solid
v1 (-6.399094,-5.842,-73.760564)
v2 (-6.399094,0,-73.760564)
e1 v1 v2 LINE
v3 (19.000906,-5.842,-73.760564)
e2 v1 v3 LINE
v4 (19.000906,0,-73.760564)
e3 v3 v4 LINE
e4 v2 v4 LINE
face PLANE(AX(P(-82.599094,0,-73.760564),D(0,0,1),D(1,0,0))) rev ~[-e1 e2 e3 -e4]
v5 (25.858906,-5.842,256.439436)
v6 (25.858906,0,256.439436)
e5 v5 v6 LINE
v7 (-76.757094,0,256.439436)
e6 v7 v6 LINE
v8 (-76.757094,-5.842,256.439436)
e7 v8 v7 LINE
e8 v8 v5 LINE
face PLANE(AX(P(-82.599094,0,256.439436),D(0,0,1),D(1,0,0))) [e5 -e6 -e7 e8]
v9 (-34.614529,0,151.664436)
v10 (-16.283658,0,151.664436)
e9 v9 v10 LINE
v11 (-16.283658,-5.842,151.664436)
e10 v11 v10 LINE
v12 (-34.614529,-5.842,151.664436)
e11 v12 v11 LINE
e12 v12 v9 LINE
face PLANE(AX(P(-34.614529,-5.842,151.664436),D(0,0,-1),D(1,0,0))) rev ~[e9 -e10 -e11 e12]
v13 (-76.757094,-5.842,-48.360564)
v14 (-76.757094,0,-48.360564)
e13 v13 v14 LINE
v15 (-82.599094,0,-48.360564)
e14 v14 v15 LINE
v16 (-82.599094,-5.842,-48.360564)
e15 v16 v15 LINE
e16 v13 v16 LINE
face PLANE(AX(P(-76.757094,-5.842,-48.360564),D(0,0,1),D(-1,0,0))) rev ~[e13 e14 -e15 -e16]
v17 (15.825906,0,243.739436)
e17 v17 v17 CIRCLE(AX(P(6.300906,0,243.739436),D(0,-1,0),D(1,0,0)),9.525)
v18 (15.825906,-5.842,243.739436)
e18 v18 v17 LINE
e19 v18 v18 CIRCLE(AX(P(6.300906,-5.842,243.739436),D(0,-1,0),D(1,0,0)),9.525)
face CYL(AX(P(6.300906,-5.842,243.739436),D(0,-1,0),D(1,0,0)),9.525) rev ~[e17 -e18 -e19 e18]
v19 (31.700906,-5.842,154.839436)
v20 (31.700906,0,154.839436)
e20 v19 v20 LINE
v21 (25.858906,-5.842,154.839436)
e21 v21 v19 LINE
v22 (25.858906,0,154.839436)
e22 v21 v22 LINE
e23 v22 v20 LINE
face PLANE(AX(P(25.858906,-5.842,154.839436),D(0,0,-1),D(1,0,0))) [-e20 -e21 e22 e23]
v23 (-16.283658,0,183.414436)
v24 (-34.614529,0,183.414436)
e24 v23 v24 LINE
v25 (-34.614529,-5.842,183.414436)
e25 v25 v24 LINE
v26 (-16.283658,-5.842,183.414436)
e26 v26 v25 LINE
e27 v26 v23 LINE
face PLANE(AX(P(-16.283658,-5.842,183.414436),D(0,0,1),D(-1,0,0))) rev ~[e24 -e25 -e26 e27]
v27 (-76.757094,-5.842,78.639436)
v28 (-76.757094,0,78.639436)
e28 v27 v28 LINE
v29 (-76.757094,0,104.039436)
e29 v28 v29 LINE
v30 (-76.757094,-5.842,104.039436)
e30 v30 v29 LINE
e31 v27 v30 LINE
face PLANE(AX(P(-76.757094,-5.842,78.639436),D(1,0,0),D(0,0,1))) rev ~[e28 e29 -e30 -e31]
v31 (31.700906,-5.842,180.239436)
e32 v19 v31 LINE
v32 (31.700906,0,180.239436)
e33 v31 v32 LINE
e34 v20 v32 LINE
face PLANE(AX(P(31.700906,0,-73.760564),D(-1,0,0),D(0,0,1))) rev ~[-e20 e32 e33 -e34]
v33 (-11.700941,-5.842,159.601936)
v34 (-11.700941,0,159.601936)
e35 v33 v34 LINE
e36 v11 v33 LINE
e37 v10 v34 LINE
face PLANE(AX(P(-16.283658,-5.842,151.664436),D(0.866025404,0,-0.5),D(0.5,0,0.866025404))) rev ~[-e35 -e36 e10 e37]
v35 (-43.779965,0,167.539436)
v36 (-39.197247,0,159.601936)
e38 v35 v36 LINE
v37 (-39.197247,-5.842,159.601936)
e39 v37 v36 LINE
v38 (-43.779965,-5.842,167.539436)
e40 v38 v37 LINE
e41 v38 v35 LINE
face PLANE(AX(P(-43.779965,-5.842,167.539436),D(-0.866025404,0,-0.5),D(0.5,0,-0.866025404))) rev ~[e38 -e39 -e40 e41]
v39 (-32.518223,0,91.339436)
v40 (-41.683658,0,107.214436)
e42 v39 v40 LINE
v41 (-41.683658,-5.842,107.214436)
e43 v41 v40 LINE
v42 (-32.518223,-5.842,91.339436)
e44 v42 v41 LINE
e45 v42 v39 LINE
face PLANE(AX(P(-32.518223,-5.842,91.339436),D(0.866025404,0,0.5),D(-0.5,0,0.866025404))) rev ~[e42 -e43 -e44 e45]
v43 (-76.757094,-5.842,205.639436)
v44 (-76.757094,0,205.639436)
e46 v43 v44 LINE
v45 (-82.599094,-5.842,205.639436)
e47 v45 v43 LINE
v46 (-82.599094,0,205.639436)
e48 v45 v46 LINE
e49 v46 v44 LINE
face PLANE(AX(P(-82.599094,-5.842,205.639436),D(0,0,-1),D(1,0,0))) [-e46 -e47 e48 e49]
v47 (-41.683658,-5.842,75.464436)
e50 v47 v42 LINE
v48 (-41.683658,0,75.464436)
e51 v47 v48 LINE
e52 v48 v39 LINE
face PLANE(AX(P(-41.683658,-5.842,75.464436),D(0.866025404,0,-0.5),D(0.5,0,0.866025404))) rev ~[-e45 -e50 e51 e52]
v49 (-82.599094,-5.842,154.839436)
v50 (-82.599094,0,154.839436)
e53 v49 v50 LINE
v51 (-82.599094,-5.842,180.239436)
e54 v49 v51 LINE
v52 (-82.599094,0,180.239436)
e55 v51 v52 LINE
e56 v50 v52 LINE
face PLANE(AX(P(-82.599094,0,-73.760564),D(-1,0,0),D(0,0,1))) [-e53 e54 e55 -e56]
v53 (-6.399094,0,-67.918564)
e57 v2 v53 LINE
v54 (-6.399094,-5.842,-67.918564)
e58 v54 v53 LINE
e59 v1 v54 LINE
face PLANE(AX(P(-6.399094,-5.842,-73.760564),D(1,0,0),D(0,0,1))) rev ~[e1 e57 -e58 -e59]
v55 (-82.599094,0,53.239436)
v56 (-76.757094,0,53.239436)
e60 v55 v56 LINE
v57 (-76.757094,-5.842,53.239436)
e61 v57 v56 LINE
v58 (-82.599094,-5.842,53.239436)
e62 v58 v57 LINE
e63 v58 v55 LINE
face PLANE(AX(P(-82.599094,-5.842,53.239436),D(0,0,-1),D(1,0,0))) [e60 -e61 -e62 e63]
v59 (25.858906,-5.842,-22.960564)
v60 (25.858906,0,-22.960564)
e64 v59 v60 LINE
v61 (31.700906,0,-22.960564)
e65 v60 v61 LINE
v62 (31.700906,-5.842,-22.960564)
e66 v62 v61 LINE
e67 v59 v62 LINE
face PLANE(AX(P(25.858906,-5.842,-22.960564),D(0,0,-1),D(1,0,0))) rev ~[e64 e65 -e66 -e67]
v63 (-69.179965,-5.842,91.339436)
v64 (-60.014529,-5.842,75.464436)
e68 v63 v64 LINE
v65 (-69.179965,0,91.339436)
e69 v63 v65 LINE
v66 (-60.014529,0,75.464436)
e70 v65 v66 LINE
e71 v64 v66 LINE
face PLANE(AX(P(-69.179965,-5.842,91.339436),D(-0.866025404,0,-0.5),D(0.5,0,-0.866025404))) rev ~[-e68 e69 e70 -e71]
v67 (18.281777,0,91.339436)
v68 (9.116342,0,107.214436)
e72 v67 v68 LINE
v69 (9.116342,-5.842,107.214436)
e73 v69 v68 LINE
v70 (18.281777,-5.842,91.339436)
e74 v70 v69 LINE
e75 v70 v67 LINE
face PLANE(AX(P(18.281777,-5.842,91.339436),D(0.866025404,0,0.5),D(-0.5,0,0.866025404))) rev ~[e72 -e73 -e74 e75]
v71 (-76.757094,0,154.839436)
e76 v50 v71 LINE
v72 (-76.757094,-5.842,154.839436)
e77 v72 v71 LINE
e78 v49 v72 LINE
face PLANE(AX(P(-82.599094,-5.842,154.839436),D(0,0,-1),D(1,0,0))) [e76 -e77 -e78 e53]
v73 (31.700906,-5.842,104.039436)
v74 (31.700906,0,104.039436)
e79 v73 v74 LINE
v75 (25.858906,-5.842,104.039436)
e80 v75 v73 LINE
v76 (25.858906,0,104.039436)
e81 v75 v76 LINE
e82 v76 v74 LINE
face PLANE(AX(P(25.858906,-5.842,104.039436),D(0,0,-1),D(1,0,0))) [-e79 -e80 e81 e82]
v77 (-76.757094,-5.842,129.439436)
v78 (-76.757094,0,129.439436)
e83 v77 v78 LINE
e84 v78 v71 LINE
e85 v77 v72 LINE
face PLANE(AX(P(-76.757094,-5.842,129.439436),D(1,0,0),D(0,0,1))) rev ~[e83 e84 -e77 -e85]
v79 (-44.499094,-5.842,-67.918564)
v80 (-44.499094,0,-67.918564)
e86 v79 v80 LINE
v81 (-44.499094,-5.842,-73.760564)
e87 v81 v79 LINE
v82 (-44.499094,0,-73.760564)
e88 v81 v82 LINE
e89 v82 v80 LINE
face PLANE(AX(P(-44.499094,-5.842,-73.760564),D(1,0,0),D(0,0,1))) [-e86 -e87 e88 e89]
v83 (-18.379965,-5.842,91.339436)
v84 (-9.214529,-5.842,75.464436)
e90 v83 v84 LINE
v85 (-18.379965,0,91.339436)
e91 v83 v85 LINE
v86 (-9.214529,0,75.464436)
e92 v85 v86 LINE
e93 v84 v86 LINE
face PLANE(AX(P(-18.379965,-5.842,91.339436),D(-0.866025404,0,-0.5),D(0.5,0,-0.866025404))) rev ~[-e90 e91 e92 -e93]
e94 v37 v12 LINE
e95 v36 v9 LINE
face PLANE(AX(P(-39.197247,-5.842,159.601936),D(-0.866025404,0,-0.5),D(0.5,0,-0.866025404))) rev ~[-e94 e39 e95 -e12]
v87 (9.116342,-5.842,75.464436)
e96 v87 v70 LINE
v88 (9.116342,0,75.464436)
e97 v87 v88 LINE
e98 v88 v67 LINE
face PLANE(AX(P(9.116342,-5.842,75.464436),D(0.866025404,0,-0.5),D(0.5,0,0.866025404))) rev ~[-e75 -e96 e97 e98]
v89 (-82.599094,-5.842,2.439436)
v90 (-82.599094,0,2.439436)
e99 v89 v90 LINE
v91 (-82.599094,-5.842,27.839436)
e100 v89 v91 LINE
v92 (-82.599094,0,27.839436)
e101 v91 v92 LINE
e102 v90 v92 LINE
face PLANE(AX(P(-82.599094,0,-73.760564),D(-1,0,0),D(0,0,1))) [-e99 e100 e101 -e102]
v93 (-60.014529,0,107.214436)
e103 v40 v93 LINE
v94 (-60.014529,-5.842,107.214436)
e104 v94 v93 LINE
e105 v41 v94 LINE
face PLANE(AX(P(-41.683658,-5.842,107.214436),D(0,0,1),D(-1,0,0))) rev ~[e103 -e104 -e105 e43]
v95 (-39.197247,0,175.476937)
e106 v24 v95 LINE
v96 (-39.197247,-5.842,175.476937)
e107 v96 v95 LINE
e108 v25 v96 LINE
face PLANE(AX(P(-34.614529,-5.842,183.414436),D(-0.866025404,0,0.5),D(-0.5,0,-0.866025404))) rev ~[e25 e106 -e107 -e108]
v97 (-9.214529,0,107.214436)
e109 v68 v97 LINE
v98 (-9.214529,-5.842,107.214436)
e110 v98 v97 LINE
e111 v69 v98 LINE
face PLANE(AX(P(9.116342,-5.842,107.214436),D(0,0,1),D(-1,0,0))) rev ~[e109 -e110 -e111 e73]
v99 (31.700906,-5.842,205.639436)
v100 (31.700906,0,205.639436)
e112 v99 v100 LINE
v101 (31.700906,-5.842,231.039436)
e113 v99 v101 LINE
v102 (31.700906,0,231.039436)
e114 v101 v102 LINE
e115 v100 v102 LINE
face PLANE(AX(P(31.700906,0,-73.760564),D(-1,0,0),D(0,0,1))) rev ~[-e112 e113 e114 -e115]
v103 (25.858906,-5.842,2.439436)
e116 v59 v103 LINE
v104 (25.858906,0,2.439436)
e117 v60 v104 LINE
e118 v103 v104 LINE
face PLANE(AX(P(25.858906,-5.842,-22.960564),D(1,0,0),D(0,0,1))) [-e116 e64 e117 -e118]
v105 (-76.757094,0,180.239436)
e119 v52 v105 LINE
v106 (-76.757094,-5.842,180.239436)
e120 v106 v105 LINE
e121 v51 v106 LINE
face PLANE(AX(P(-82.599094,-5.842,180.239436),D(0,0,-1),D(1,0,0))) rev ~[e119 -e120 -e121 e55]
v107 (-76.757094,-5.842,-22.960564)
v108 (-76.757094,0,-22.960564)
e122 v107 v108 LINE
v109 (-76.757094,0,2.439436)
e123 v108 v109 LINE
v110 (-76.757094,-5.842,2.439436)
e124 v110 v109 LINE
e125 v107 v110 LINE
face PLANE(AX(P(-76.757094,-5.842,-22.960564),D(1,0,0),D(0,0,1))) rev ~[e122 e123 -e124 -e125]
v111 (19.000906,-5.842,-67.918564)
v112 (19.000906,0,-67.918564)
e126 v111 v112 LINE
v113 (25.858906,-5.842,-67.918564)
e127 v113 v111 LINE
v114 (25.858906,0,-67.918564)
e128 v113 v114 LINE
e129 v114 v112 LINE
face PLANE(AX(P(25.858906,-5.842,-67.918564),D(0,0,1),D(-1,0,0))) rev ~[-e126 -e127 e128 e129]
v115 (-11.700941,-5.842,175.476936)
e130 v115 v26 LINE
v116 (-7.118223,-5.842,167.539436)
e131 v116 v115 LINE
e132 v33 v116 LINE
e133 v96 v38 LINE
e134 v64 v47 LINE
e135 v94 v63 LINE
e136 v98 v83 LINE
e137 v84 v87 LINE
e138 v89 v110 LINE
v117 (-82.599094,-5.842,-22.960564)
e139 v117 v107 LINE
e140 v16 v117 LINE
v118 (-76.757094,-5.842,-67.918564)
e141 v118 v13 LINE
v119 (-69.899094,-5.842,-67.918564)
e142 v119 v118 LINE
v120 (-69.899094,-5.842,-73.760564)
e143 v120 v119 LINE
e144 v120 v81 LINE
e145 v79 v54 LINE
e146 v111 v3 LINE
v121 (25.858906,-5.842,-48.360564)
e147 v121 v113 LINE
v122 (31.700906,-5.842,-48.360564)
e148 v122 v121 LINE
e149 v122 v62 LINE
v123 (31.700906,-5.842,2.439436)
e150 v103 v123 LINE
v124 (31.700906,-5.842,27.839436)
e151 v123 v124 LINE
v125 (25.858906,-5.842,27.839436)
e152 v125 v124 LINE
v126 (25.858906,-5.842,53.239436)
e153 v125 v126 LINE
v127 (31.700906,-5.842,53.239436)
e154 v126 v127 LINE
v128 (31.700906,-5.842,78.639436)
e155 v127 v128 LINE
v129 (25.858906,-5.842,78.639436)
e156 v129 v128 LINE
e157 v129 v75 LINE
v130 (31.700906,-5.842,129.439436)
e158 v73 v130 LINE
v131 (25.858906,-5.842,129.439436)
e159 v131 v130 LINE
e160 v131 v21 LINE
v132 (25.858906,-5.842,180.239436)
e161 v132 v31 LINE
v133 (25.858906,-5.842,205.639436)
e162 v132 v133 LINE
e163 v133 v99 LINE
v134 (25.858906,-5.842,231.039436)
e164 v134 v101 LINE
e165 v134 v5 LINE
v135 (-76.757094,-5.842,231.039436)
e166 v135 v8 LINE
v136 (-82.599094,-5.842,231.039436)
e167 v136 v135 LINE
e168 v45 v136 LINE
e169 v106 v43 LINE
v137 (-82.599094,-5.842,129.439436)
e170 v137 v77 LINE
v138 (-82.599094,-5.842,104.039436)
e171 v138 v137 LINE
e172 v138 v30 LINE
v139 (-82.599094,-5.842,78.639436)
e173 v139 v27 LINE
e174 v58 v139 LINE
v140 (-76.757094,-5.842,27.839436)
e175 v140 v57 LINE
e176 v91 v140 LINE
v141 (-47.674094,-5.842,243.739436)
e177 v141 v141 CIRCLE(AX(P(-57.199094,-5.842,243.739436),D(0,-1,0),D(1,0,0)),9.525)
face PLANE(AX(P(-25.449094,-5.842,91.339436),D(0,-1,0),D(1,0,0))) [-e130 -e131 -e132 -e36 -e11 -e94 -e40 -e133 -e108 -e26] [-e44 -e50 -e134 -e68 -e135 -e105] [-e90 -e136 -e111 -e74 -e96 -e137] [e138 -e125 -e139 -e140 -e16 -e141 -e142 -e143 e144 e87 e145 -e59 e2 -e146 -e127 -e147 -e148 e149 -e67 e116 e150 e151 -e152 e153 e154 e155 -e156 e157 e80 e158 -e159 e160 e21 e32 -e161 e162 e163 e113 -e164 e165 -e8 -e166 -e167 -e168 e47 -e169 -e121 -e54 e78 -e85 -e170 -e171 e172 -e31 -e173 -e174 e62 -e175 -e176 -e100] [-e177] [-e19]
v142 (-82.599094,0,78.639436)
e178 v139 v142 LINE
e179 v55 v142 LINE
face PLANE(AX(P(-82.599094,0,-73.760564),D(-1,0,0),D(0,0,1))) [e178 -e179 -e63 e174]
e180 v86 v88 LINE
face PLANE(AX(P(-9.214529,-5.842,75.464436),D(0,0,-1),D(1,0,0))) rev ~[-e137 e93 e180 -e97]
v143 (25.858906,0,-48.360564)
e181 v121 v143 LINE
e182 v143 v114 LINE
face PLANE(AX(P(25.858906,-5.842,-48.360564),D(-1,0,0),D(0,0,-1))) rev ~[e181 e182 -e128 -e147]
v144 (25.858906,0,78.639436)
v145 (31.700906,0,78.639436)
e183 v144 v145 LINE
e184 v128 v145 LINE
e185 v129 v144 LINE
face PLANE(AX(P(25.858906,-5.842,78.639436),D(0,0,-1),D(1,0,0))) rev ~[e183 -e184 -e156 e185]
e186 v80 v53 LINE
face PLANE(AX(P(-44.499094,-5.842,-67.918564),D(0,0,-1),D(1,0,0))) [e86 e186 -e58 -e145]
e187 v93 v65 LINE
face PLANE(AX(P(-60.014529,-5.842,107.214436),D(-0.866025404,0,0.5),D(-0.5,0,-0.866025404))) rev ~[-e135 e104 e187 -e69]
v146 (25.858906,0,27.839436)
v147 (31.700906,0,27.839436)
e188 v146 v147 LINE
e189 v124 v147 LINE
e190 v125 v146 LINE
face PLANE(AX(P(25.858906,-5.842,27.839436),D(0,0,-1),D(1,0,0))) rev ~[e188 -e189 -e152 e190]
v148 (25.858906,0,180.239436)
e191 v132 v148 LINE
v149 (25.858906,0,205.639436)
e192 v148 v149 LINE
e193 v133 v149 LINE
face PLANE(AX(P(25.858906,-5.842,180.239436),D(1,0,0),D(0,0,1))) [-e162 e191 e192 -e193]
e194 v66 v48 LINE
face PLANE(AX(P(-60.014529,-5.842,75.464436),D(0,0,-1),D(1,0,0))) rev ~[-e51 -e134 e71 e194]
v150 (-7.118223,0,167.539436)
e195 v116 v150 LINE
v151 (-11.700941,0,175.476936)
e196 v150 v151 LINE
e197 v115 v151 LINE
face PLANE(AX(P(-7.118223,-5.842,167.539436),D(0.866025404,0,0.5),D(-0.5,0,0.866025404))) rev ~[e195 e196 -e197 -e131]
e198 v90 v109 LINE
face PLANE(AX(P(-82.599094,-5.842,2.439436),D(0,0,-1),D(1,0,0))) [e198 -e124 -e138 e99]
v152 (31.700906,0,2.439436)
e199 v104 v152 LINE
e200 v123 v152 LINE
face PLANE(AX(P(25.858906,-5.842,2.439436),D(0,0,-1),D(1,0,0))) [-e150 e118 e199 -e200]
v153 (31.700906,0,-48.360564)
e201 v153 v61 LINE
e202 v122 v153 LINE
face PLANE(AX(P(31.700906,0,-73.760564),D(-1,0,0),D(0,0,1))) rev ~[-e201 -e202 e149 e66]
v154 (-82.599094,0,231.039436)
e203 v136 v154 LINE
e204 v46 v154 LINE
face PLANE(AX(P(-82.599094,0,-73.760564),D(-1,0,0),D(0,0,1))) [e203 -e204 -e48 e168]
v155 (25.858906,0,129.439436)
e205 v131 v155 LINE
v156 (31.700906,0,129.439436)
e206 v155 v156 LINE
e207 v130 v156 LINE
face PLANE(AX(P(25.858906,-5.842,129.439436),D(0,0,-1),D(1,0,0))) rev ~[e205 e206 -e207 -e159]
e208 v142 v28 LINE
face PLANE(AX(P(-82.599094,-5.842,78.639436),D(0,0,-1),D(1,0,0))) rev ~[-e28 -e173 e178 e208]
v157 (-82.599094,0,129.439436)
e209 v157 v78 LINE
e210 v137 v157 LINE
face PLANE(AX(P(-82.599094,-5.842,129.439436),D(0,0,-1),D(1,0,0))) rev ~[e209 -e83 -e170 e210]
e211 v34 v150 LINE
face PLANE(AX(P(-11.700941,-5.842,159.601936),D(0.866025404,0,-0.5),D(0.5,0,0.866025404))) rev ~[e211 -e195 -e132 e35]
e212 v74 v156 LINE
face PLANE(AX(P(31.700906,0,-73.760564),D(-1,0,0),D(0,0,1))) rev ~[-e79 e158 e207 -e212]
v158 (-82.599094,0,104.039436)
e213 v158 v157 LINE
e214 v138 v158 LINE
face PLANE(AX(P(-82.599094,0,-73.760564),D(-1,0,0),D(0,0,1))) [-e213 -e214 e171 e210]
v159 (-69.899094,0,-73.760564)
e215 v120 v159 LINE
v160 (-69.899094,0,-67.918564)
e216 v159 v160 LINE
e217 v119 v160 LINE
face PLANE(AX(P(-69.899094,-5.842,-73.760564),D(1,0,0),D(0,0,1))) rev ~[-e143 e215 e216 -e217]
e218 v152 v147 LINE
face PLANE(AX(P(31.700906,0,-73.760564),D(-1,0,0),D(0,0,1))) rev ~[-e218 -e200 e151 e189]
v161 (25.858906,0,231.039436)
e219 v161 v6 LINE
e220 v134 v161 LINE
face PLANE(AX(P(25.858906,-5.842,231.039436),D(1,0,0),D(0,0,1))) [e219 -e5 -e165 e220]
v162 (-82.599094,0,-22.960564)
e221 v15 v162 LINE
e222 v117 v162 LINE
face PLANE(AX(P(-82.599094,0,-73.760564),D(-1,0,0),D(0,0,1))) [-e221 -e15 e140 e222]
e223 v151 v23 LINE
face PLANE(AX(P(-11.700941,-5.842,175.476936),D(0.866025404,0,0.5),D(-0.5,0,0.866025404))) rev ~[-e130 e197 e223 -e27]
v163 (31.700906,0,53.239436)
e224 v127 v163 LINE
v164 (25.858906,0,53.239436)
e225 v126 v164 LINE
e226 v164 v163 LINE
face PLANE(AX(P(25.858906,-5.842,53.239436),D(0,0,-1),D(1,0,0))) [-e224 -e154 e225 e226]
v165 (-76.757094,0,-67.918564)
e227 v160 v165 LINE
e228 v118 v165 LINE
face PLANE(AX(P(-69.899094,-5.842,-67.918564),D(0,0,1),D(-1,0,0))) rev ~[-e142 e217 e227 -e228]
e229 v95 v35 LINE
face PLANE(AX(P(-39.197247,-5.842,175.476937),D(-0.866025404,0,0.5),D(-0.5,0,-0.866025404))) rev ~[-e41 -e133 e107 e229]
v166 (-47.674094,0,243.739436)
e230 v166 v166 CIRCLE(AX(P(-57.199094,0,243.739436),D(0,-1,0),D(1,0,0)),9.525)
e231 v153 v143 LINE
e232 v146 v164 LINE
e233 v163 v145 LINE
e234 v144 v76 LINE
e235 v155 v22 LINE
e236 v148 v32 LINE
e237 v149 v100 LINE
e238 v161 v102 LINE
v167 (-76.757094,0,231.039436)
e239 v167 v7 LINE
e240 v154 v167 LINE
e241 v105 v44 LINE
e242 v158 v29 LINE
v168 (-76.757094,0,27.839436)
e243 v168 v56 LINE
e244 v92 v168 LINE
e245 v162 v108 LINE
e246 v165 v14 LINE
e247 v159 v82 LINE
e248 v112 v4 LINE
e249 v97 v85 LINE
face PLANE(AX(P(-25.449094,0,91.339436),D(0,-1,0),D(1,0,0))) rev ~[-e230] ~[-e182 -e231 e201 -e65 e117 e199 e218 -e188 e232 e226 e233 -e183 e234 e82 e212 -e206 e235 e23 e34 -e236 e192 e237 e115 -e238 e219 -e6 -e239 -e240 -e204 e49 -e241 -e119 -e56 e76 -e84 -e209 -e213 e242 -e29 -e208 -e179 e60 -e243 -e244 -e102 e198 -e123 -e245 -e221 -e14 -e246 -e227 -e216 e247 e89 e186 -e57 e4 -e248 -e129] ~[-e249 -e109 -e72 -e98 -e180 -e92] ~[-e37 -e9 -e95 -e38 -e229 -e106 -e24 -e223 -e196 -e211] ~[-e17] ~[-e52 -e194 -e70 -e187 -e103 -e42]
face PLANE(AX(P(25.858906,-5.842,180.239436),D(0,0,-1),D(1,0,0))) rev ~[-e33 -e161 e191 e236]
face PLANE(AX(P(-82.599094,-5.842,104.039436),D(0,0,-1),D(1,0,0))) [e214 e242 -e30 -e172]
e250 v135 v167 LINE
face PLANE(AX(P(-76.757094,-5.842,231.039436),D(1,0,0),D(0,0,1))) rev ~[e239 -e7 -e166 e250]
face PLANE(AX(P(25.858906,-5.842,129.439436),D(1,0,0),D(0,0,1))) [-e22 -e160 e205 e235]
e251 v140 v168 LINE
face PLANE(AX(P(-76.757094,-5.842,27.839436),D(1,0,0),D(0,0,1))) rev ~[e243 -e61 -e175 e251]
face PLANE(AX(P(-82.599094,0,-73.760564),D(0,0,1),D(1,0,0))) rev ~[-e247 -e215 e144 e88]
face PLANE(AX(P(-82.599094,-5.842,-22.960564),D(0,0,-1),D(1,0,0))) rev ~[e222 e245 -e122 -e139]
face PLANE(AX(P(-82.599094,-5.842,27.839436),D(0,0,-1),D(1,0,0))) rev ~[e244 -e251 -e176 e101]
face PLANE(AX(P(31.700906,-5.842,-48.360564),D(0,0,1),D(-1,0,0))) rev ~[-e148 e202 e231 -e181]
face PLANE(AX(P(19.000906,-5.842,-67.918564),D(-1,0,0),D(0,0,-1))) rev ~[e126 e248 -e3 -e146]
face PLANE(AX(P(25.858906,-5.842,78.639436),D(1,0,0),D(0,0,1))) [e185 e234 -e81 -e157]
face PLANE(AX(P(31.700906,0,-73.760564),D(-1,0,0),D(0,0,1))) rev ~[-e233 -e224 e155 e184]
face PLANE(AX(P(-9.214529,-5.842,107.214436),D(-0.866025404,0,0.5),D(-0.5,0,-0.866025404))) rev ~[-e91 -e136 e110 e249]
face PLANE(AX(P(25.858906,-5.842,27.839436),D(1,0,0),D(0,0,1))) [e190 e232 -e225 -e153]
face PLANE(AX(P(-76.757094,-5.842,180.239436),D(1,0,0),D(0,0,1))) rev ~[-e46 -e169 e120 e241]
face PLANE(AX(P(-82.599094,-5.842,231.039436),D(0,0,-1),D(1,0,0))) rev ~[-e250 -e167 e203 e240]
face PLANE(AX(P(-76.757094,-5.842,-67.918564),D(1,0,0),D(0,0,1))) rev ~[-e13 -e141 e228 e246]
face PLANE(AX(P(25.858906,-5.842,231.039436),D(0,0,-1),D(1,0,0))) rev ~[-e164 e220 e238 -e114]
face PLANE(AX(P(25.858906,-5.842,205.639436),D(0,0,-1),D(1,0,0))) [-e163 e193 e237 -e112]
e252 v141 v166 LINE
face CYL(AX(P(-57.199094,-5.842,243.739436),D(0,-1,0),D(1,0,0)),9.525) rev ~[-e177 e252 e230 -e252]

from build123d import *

# Parameters (mm, degrees)
F0_W     = 114.3
F0_H     = 330.2
F1_DEPTH = 5.842
F2_W     = 38.1
F2_H     = 5.842
F2_W_2   = 5.842
F2_H_2   = 25.4
F3_DEPTH = 25.4
F4_R     = 9.525
F5_DEPTH = 5.842


# Not quite as in the source:
# - a feature names something its author has since deleted; it is built from what else it names


with BuildPart() as f1:
    # F0 (on Front) → F1 (new body)
    with BuildSketch(Plane.XZ):
        with Locations((-25.4490938969, 91.3394362139)):
            Rectangle(F0_W, F0_H)
    extrude(amount=F1_DEPTH)

    # F2 (on face) → F3 (cut)
    with BuildSketch(Plane.XZ.offset(5.842)):
        Polygon((-82.5990938969, -73.7605637861), (-69.8990938969, -73.7605637861), (-69.8990938969, -67.9185637861), (-76.7570938969, -67.9185637861), (-76.7570938969, -48.3605637861), (-82.5990938969, -48.3605637861), align=None)
        with Locations((-25.4490938969, -70.8395637861)):
            Rectangle(F2_W, F2_H)
        Polygon((19.0009061031, -67.9185637861), (19.0009061031, -73.7605637861), (31.7009061031, -73.7605637861), (31.7009061031, -48.3605637861), (25.8589061031, -48.3605637861), (25.8589061031, -67.9185637861), align=None)
        with Locations((-79.6780938969, -10.2605637861)):
            Rectangle(F2_W_2, F2_H_2)
        with Locations((28.7799061031, -10.2605637861)):
            Rectangle(F2_W_2, F2_H_2)
        with Locations((-79.6780938969, 40.5394362139)):
            Rectangle(F2_W_2, F2_H_2)
        with Locations((28.7799061031, 40.5394362139)):
            Rectangle(F2_W_2, F2_H_2)
        with Locations((-79.6780938969, 91.3394362139)):
            Rectangle(F2_W_2, F2_H_2)
        with Locations((28.7799061031, 91.3394362139)):
            Rectangle(F2_W_2, F2_H_2)
        with Locations((-79.6780938969, 142.1394362139)):
            Rectangle(F2_W_2, F2_H_2)
        with Locations((28.7799061031, 142.1394362139)):
            Rectangle(F2_W_2, F2_H_2)
        with Locations((-79.6780938969, 192.9394362139)):
            Rectangle(F2_W_2, F2_H_2)
        with Locations((28.7799061031, 192.9394362139)):
            Rectangle(F2_W_2, F2_H_2)
        with Locations((28.7799061031, 243.7394362139)):
            Rectangle(F2_W_2, F2_H_2)
        with Locations((-79.6780938969, 243.7394362139)):
            Rectangle(F2_W_2, F2_H_2)
    extrude(amount=-F3_DEPTH, mode=Mode.SUBTRACT)

    # F4 (on face) → F5 (cut, through all)
    with BuildSketch(Plane.XZ.offset(5.842)):
        with BuildLine():
            ThreePointArc((-11.7009406501, 159.6019361475), (-10.1150214145, 163.4306838358), (-9.5740938969, 167.5394362139))
            ThreePointArc((-9.5740938969, 167.5394362139), (-10.1150214004, 171.6481885393), (-11.7009405957, 175.4769361859))
            ThreePointArc((-11.7009405957, 175.4769361859), (-17.5115938829, 181.2875894909), (-25.4490938969, 183.4144362139))
            ThreePointArc((-25.4490938969, 183.4144362139), (-33.3865937403, 181.2875895894), (-39.1972470011, 175.4769365272))
            ThreePointArc((-39.1972470011, 175.4769365272), (-41.3240938969, 167.5394362139), (-39.1972470011, 159.6019359006))
            ThreePointArc((-39.1972470011, 159.6019359006), (-33.3865937403, 153.7912828383), (-25.4490938969, 151.6644362139))
            ThreePointArc((-25.4490938969, 151.6644362139), (-17.5115939301, 153.7912829096), (-11.7009406501, 159.6019361475))
        make_face()
        with Locations((-57.1990938969, 243.7394362139)):
            Circle(F4_R)
        with Locations((6.3009061031, 243.7394362139)):
            Circle(F4_R)
        Polygon((-32.5182228501, 91.3394362139), (-41.6836583735, 107.2144362139), (-60.0145294203, 107.2144362139), (-69.1799649437, 91.3394362139), (-60.0145294203, 75.4644362139), (-41.6836583735, 75.4644362139), align=None)
        Polygon((18.2817771499, 91.3394362139), (9.1163416265, 107.2144362139), (-9.2145294203, 107.2144362139), (-18.3799649437, 91.3394362139), (-9.2145294203, 75.4644362139), (9.1163416265, 75.4644362139), align=None)
        with BuildLine():
            ThreePointArc((-39.1972470011, 175.4769365272), (-33.3865937403, 181.2875895894), (-25.4490938969, 183.4144362139))
            Line((-25.4490938969, 183.4144362139), (-34.6145294203, 183.4144362139))
            Line((-34.6145294203, 183.4144362139), (-39.1972470011, 175.4769365272))
        make_face()
        with BuildLine():
            ThreePointArc((-25.4490938969, 183.4144362139), (-17.5115938829, 181.2875894909), (-11.7009405957, 175.4769361859))
            Line((-11.7009405957, 175.4769361859), (-16.2836583735, 183.4144362139))
            Line((-16.2836583735, 183.4144362139), (-25.4490938969, 183.4144362139))
        make_face()
        with BuildLine():
            ThreePointArc((-11.7009405957, 175.4769361859), (-10.1150214004, 171.6481885393), (-9.5740938969, 167.5394362139))
            ThreePointArc((-9.5740938969, 167.5394362139), (-10.1150214145, 163.4306838358), (-11.7009406501, 159.6019361475))
            Line((-11.7009406501, 159.6019361475), (-7.1182228501, 167.5394362139))
            Line((-7.1182228501, 167.5394362139), (-11.7009405957, 175.4769361859))
        make_face()
        with BuildLine():
            Line((-16.2836583735, 151.6644362139), (-11.7009406501, 159.6019361475))
            ThreePointArc((-11.7009406501, 159.6019361475), (-17.5115939301, 153.7912829096), (-25.4490938969, 151.6644362139))
            Line((-25.4490938969, 151.6644362139), (-16.2836583735, 151.6644362139))
        make_face()
        with BuildLine():
            Line((-34.6145294203, 151.6644362139), (-25.4490938969, 151.6644362139))
            ThreePointArc((-25.4490938969, 151.6644362139), (-33.3865937403, 153.7912828383), (-39.1972470011, 159.6019359006))
            Line((-39.1972470011, 159.6019359006), (-34.6145294203, 151.6644362139))
        make_face()
        with BuildLine():
            ThreePointArc((-39.1972470011, 159.6019359006), (-41.3240938969, 167.5394362139), (-39.1972470011, 175.4769365272))
            Line((-39.1972470011, 175.4769365272), (-43.7799649437, 167.5394362139))
            Line((-43.7799649437, 167.5394362139), (-39.1972470011, 159.6019359006))
        make_face()
    extrude(amount=-F5_DEPTH, mode=Mode.SUBTRACT)


solid = f1.part
